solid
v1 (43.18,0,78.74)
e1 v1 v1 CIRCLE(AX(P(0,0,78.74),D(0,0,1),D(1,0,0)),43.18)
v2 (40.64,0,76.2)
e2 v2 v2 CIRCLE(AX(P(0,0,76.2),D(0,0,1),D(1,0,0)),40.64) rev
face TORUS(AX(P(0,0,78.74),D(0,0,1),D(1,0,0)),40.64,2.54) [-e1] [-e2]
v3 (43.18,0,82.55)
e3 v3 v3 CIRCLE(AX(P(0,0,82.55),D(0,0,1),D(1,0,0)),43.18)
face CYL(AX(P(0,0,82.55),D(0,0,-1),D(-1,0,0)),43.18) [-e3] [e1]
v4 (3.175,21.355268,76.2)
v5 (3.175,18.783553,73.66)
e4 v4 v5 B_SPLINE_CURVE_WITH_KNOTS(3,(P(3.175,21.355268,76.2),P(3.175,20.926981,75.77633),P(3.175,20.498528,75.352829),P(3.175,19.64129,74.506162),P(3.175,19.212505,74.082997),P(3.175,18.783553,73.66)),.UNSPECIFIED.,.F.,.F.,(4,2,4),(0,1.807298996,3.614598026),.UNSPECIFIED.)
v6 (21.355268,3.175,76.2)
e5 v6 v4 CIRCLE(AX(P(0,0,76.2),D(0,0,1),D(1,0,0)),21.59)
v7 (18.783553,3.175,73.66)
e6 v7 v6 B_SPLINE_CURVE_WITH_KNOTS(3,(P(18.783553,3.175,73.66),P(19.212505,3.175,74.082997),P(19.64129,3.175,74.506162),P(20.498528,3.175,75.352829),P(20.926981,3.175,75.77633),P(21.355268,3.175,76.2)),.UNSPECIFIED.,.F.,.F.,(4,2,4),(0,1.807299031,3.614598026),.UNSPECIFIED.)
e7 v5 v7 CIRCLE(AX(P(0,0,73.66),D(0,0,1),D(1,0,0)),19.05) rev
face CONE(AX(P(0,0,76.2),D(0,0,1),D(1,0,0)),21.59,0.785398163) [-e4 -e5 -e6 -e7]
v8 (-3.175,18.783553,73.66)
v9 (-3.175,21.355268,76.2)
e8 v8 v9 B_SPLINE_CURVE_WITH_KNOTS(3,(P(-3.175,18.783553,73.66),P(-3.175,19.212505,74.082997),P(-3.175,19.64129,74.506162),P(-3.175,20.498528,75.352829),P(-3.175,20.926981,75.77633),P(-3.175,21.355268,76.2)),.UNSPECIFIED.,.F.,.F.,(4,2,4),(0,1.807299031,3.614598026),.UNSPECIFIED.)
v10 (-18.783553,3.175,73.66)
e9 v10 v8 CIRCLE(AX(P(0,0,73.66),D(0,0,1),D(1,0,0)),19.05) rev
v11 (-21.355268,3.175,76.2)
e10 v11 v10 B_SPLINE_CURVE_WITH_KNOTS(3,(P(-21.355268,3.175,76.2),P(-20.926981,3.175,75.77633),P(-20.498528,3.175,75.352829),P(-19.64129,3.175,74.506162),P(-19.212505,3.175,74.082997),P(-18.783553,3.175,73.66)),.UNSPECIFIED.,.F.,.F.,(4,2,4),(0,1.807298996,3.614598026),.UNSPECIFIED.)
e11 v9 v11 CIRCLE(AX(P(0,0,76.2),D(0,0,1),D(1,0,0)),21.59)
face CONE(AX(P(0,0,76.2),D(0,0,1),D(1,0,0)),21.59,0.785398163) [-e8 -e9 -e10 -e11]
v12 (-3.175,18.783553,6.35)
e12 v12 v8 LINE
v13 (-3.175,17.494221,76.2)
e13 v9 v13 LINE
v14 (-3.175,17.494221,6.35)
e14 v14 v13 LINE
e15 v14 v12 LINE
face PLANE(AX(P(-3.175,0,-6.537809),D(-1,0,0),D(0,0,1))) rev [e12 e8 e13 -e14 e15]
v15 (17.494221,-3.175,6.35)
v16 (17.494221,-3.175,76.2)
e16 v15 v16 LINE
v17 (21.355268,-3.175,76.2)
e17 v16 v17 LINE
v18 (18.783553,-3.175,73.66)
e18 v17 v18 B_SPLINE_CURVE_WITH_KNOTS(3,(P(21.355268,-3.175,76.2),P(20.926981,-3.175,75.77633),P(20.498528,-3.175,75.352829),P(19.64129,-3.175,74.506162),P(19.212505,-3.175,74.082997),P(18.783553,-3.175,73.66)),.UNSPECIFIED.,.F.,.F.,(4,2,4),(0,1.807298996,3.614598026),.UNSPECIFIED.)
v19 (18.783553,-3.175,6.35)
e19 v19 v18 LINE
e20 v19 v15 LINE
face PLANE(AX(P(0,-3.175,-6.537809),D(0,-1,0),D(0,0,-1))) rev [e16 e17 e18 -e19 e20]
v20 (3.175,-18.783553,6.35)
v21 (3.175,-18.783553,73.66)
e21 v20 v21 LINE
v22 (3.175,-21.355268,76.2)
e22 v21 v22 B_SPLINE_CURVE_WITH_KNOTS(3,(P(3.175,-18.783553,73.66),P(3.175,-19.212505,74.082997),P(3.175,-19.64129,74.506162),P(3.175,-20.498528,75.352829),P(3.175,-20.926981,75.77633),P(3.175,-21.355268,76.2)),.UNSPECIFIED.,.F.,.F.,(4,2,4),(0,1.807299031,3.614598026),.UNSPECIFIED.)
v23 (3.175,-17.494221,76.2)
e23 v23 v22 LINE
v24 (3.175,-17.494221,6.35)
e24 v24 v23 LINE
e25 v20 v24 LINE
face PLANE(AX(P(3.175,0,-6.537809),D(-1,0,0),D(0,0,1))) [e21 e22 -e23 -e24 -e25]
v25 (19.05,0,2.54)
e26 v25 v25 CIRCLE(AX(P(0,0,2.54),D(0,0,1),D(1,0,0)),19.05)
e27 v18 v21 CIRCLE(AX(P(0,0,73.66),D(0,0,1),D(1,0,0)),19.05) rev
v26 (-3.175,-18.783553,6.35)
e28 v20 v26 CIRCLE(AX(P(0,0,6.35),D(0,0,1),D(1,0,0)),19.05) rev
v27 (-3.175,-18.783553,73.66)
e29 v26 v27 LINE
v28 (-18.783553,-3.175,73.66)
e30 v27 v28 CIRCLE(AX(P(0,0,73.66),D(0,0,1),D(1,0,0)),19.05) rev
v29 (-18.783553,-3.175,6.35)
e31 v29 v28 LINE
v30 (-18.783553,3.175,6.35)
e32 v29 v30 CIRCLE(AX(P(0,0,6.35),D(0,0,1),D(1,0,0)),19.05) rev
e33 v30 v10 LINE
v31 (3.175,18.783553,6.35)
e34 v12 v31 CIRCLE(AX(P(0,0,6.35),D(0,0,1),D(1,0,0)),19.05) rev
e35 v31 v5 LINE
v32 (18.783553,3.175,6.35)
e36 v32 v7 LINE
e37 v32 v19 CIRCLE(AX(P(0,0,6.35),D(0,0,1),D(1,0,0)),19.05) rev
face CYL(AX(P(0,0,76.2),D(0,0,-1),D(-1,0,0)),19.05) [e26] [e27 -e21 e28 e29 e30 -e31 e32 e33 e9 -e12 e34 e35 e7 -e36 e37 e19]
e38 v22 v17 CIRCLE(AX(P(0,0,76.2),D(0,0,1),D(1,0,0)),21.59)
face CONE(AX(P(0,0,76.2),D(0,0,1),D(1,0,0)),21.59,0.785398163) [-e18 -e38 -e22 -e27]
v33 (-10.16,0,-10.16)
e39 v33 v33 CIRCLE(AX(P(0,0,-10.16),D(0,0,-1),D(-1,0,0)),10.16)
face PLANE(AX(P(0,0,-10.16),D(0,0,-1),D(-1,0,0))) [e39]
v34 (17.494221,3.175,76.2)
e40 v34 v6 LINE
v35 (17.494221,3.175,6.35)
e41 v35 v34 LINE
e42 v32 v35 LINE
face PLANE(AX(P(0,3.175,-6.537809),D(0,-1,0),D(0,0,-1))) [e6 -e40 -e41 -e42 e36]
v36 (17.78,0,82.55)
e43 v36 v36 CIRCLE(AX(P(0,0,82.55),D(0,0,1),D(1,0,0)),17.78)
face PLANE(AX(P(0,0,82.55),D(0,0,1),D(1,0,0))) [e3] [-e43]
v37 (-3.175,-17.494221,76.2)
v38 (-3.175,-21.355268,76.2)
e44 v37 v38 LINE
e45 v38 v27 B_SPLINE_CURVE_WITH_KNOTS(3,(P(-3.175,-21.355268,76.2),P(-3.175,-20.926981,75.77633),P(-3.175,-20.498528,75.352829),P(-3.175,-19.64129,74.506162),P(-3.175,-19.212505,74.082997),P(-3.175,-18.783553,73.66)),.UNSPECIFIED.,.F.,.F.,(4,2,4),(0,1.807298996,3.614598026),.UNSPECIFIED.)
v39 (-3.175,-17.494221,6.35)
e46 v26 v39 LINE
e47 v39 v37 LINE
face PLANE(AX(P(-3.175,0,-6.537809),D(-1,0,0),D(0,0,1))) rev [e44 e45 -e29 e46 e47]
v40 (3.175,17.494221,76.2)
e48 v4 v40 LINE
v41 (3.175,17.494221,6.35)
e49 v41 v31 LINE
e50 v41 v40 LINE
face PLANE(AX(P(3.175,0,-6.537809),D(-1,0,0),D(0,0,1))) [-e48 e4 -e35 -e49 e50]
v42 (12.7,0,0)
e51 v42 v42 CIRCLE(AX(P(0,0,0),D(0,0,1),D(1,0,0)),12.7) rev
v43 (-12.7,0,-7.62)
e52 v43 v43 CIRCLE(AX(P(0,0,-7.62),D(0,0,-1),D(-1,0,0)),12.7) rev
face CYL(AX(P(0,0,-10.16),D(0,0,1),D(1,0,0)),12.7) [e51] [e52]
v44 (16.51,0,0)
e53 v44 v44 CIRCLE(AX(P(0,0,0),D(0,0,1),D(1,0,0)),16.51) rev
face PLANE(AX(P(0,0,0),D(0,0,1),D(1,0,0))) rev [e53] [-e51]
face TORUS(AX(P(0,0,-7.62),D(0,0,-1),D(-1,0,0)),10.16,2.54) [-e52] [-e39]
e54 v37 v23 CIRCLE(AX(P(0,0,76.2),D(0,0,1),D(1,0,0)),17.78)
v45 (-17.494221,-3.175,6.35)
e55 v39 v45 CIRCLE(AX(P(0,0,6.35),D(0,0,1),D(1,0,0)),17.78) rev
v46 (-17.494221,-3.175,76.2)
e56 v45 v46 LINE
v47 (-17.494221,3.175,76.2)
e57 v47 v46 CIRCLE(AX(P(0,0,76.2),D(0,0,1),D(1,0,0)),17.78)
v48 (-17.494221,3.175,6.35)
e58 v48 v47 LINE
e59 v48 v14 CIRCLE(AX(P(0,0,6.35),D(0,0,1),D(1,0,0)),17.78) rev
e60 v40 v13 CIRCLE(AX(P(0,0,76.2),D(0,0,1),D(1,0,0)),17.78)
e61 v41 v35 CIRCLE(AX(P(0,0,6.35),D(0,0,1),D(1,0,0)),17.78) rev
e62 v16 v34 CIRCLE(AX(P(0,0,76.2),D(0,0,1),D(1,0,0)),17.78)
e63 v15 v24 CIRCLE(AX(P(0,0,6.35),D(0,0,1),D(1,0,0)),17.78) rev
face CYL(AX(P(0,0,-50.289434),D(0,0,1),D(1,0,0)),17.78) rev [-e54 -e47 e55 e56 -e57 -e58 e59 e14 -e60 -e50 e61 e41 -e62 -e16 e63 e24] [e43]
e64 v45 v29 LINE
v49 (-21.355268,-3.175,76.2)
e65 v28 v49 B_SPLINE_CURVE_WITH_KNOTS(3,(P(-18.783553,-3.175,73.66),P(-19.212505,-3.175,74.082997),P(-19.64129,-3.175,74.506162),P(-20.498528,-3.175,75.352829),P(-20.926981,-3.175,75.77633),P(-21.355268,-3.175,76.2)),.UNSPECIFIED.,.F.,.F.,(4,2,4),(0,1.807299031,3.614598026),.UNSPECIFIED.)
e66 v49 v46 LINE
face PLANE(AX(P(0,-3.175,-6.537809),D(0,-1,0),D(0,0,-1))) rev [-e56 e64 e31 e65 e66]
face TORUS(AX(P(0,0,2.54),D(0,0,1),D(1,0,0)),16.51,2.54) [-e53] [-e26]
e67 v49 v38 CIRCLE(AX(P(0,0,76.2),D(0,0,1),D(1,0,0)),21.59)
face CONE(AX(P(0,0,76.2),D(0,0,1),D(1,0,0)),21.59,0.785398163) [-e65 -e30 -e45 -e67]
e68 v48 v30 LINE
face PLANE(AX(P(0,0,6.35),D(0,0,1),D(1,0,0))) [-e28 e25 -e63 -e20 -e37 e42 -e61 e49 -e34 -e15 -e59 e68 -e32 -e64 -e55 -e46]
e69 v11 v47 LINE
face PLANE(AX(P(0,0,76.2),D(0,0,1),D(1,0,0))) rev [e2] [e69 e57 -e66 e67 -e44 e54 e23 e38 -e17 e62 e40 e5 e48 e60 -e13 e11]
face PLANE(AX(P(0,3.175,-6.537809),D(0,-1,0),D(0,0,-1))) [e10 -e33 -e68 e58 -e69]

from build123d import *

# Parameters (mm, degrees)
SKETCH1_R           = 19.05
BOSS_EXTRUDE1_DEPTH = 76.2
SKETCH2_R           = 17.78
CUT_EXTRUDE1_DEPTH  = 69.85
CUT_EXTRUDE2_DEPTH  = 69.85
BOSS_EXTRUDE2_START = 6.35
SKETCH4_R           = 43.18
SKETCH4_R_2         = 17.78
BOSS_EXTRUDE2_DEPTH = 6.35
SKETCH5_R           = 12.7
BOSS_EXTRUDE3_DEPTH = 10.16
FILLET1_R           = 2.54
CHAMFER1_SIZE       = 2.54


with BuildPart() as part:
    # Sketch1 → Boss-Extrude1 (new body)
    with BuildSketch(Plane.XY):
        with Locations(Location((0, 0, 0), (0, 0, 180))):
            Circle(SKETCH1_R)
    extrude(amount=BOSS_EXTRUDE1_DEPTH)

    # Sketch2 → Cut-Extrude1 (cut)
    with BuildSketch(Plane.XY.offset(76.2)):
        Circle(SKETCH2_R)
    extrude(amount=-CUT_EXTRUDE1_DEPTH, mode=Mode.SUBTRACT)

    # Sketch3 → Cut-Extrude2 (cut)
    with BuildSketch(Plane.XY.offset(76.2)):
        with BuildLine():
            Line((-17.494221189, 3.175), (-18.783553311, 3.175))
            ThreePointArc((-18.783553311, 3.175), (-19.05, 0), (-18.783553311, -3.175))
            Line((-18.783553311, -3.175), (-17.494221189, -3.175))
            ThreePointArc((-17.494221189, -3.175), (-17.78, 0), (-17.494221189, 3.175))
        make_face()
        with BuildLine():
            ThreePointArc((19.05, 0), (18.983271459, 1.593080258), (18.783553311, 3.175))
            Line((18.783553311, 3.175), (17.494221189, 3.175))
            ThreePointArc((17.494221189, 3.175), (17.708411176, 1.593917699), (17.78, 0))
            ThreePointArc((17.78, 0), (17.708411176, -1.593917699), (17.494221189, -3.175))
            Line((17.494221189, -3.175), (18.783553311, -3.175))
            ThreePointArc((18.783553311, -3.175), (18.983271459, -1.593080258), (19.05, 0))
        make_face()
        with BuildLine():
            ThreePointArc((3.175, 18.783553311), (0, 19.05), (-3.175, 18.783553311))
            Line((-3.175, 18.783553311), (-3.175, 17.494221189))
            ThreePointArc((-3.175, 17.494221189), (0, 17.78), (3.175, 17.494221189))
            Line((3.175, 17.494221189), (3.175, 18.783553311))
        make_face()
        with BuildLine():
            Line((-3.175, -17.494221189), (-3.175, -18.783553311))
            ThreePointArc((-3.175, -18.783553311), (0, -19.05), (3.175, -18.783553311))
            Line((3.175, -18.783553311), (3.175, -17.494221189))
            ThreePointArc((3.175, -17.494221189), (0, -17.78), (-3.175, -17.494221189))
        make_face()
    extrude(amount=-CUT_EXTRUDE2_DEPTH, mode=Mode.SUBTRACT)

    # Sketch4 → Boss-Extrude2 (add)
    with BuildSketch(Plane.XY.offset(76.2).offset(BOSS_EXTRUDE2_START)):
        Circle(SKETCH4_R)
        Circle(SKETCH4_R_2, mode=Mode.SUBTRACT)
    extrude(amount=-BOSS_EXTRUDE2_DEPTH)

    # Sketch5 → Boss-Extrude3 (add)
    with BuildSketch(Plane(origin=(0, 0, 0), x_dir=(-1, 0, 0), z_dir=(0, 0, -1))):
        with Locations(Location((0, 0, 0), (0, 0, 180))):
            Circle(SKETCH5_R)
    extrude(amount=BOSS_EXTRUDE3_DEPTH)

    # Fillet1
    fillet1_edges = [part.edges().sort_by_distance(p)[0] for p in [
        (19.05, 0, 0),
        (-43.18, 0, 76.2),
        (-12.7, 0, -10.16),
    ]]
    fillet(fillet1_edges, radius=FILLET1_R)

    # Chamfer1
    # the kernel refuses this chamfer: 2.54 mm, written as the material it adds along each edge
    with BuildSketch(Plane(origin=(0, 0, 76.2), x_dir=(-0.9846344295499855, 0.1746282913641848, 0), z_dir=(0.1746282913641848, 0.9846344295499855, 0))) as chamfer1_piece_1_section:
        Polygon((19.05 + CHAMFER1_SIZE, 0), (19.05, -CHAMFER1_SIZE), (19.05, 0), align=None)
    chamfer1_piece_1 = revolve(axis=Axis((0, 0, 76.2), (0, 0, 1)), revolution_arc=110.114055389, mode=Mode.PRIVATE)
    chamfer1_piece_1 = split(chamfer1_piece_1, bisect_by=Plane(origin=(-19.847264072, 3.175, 75.490542074), z_dir=(0, 1, 0)), keep=Keep.TOP, mode=Mode.PRIVATE)
    add(chamfer1_piece_1)
    with BuildSketch(Plane(origin=(0, 0, 76.2), x_dir=(-0.9846344295499855, 0.1746282913641848, 0), z_dir=(0.1746282913641848, 0.9846344295499855, 0))) as chamfer1_piece_2_section:
        Polygon((19.05 + CHAMFER1_SIZE, 0), (19.05, -CHAMFER1_SIZE), (19.05, 0), align=None)
    chamfer1_piece_2 = revolve(axis=Axis((0, 0, 76.2), (0, 0, 1)), revolution_arc=110.114055389, mode=Mode.PRIVATE)
    chamfer1_piece_2 = split(chamfer1_piece_2, bisect_by=Plane(origin=(-14.346148442, -3.175, 74.961482306), z_dir=(0, -1, 0)), keep=Keep.TOP, mode=Mode.PRIVATE)
    chamfer1_piece_2 = split(chamfer1_piece_2, bisect_by=Plane(origin=(-3.175, -14.346148442, 74.961482306), z_dir=(-1, 0, 0)), keep=Keep.TOP, mode=Mode.PRIVATE)
    add(chamfer1_piece_2)
    with BuildSketch(Plane(origin=(0, 0, 76.2), x_dir=(-0.9846344295499855, 0.1746282913641848, 0), z_dir=(0.1746282913641848, 0.9846344295499855, 0))) as chamfer1_piece_3_section:
        Polygon((19.05 + CHAMFER1_SIZE, 0), (19.05, -CHAMFER1_SIZE), (19.05, 0), align=None)
    chamfer1_piece_3 = revolve(axis=Axis((0, 0, 76.2), (0, 0, 1)), revolution_arc=110.114055389, mode=Mode.PRIVATE)
    chamfer1_piece_3 = split(chamfer1_piece_3, bisect_by=Plane(origin=(3.175, -19.847263843, 75.490541907), z_dir=(1, 0, 0)), keep=Keep.TOP, mode=Mode.PRIVATE)
    add(chamfer1_piece_3)
    with BuildSketch(Plane(origin=(0, 0, 76.2), x_dir=(0.9846344295499821, -0.1746282913642033, 0), z_dir=(-0.1746282913642033, -0.9846344295499821, 0))) as chamfer1_piece_4_section:
        Polygon((19.05 + CHAMFER1_SIZE, 0), (19.05, -CHAMFER1_SIZE), (19.05, 0), align=None)
    chamfer1_piece_4 = revolve(axis=Axis((0, 0, 76.2), (0, 0, 1)), revolution_arc=110.114055389, mode=Mode.PRIVATE)
    chamfer1_piece_4 = split(chamfer1_piece_4, bisect_by=Plane(origin=(19.847264072, -3.175, 75.490542074), z_dir=(0, -1, 0)), keep=Keep.TOP, mode=Mode.PRIVATE)
    add(chamfer1_piece_4)
    with BuildSketch(Plane(origin=(0, 0, 76.2), x_dir=(0.9846344295499821, -0.1746282913642033, 0), z_dir=(-0.1746282913642033, -0.9846344295499821, 0))) as chamfer1_piece_5_section:
        Polygon((19.05 + CHAMFER1_SIZE, 0), (19.05, -CHAMFER1_SIZE), (19.05, 0), align=None)
    chamfer1_piece_5 = revolve(axis=Axis((0, 0, 76.2), (0, 0, 1)), revolution_arc=110.114055389, mode=Mode.PRIVATE)
    chamfer1_piece_5 = split(chamfer1_piece_5, bisect_by=Plane(origin=(14.346148442, 3.175, 74.961482306), z_dir=(0, 1, 0)), keep=Keep.TOP, mode=Mode.PRIVATE)
    chamfer1_piece_5 = split(chamfer1_piece_5, bisect_by=Plane(origin=(3.175, 14.346148442, 74.961482306), z_dir=(1, 0, 0)), keep=Keep.TOP, mode=Mode.PRIVATE)
    add(chamfer1_piece_5)
    with BuildSketch(Plane(origin=(0, 0, 76.2), x_dir=(0.9846344295499821, -0.1746282913642033, 0), z_dir=(-0.1746282913642033, -0.9846344295499821, 0))) as chamfer1_piece_6_section:
        Polygon((19.05 + CHAMFER1_SIZE, 0), (19.05, -CHAMFER1_SIZE), (19.05, 0), align=None)
    chamfer1_piece_6 = revolve(axis=Axis((0, 0, 76.2), (0, 0, 1)), revolution_arc=110.114055389, mode=Mode.PRIVATE)
    chamfer1_piece_6 = split(chamfer1_piece_6, bisect_by=Plane(origin=(-3.175, 19.847263843, 75.490541907), z_dir=(-1, 0, 0)), keep=Keep.TOP, mode=Mode.PRIVATE)
    add(chamfer1_piece_6)
    with BuildSketch(Plane(origin=(0, 0, 76.2), x_dir=(0.1746282913641894, 0.9846344295499847, 0), z_dir=(0.9846344295499847, -0.1746282913641894, 0))) as chamfer1_piece_7_section:
        Polygon((19.05 + CHAMFER1_SIZE, 0), (19.05, -CHAMFER1_SIZE), (19.05, 0), align=None)
    chamfer1_piece_7 = revolve(axis=Axis((0, 0, 76.2), (0, 0, 1)), revolution_arc=110.114055389, mode=Mode.PRIVATE)
    chamfer1_piece_7 = split(chamfer1_piece_7, bisect_by=Plane(origin=(3.175, 19.847264072, 75.490542074), z_dir=(1, 0, 0)), keep=Keep.TOP, mode=Mode.PRIVATE)
    add(chamfer1_piece_7)
    with BuildSketch(Plane(origin=(0, 0, 76.2), x_dir=(0.1746282913641894, 0.9846344295499847, 0), z_dir=(0.9846344295499847, -0.1746282913641894, 0))) as chamfer1_piece_8_section:
        Polygon((19.05 + CHAMFER1_SIZE, 0), (19.05, -CHAMFER1_SIZE), (19.05, 0), align=None)
    chamfer1_piece_8 = revolve(axis=Axis((0, 0, 76.2), (0, 0, 1)), revolution_arc=110.114055389, mode=Mode.PRIVATE)
    chamfer1_piece_8 = split(chamfer1_piece_8, bisect_by=Plane(origin=(-3.175, 14.346148442, 74.961482306), z_dir=(-1, 0, 0)), keep=Keep.TOP, mode=Mode.PRIVATE)
    chamfer1_piece_8 = split(chamfer1_piece_8, bisect_by=Plane(origin=(-14.346148442, 3.175, 74.961482306), z_dir=(0, 1, 0)), keep=Keep.TOP, mode=Mode.PRIVATE)
    add(chamfer1_piece_8)
    with BuildSketch(Plane(origin=(0, 0, 76.2), x_dir=(0.1746282913641894, 0.9846344295499847, 0), z_dir=(0.9846344295499847, -0.1746282913641894, 0))) as chamfer1_piece_9_section:
        Polygon((19.05 + CHAMFER1_SIZE, 0), (19.05, -CHAMFER1_SIZE), (19.05, 0), align=None)
    chamfer1_piece_9 = revolve(axis=Axis((0, 0, 76.2), (0, 0, 1)), revolution_arc=110.114055389, mode=Mode.PRIVATE)
    chamfer1_piece_9 = split(chamfer1_piece_9, bisect_by=Plane(origin=(-19.847263843, -3.175, 75.490541907), z_dir=(0, -1, 0)), keep=Keep.TOP, mode=Mode.PRIVATE)
    add(chamfer1_piece_9)
    with BuildSketch(Plane(origin=(0, 0, 76.2), x_dir=(-0.1746282913641849, -0.9846344295499855, 0), z_dir=(-0.9846344295499855, 0.1746282913641849, 0))) as chamfer1_piece_10_section:
        Polygon((19.05 + CHAMFER1_SIZE, 0), (19.05, -CHAMFER1_SIZE), (19.05, 0), align=None)
    chamfer1_piece_10 = revolve(axis=Axis((0, 0, 76.2), (0, 0, 1)), revolution_arc=110.114055389, mode=Mode.PRIVATE)
    chamfer1_piece_10 = split(chamfer1_piece_10, bisect_by=Plane(origin=(-3.175, -19.847264072, 75.490542074), z_dir=(-1, 0, 0)), keep=Keep.TOP, mode=Mode.PRIVATE)
    add(chamfer1_piece_10)
    with BuildSketch(Plane(origin=(0, 0, 76.2), x_dir=(-0.1746282913641849, -0.9846344295499855, 0), z_dir=(-0.9846344295499855, 0.1746282913641849, 0))) as chamfer1_piece_11_section:
        Polygon((19.05 + CHAMFER1_SIZE, 0), (19.05, -CHAMFER1_SIZE), (19.05, 0), align=None)
    chamfer1_piece_11 = revolve(axis=Axis((0, 0, 76.2), (0, 0, 1)), revolution_arc=110.114055389, mode=Mode.PRIVATE)
    chamfer1_piece_11 = split(chamfer1_piece_11, bisect_by=Plane(origin=(3.175, -14.346148442, 74.961482306), z_dir=(1, 0, 0)), keep=Keep.TOP, mode=Mode.PRIVATE)
    chamfer1_piece_11 = split(chamfer1_piece_11, bisect_by=Plane(origin=(14.346148442, -3.175, 74.961482306), z_dir=(0, -1, 0)), keep=Keep.TOP, mode=Mode.PRIVATE)
    add(chamfer1_piece_11)
    with BuildSketch(Plane(origin=(0, 0, 76.2), x_dir=(-0.1746282913641849, -0.9846344295499855, 0), z_dir=(-0.9846344295499855, 0.1746282913641849, 0))) as chamfer1_piece_12_section:
        Polygon((19.05 + CHAMFER1_SIZE, 0), (19.05, -CHAMFER1_SIZE), (19.05, 0), align=None)
    chamfer1_piece_12 = revolve(axis=Axis((0, 0, 76.2), (0, 0, 1)), revolution_arc=110.114055389, mode=Mode.PRIVATE)
    chamfer1_piece_12 = split(chamfer1_piece_12, bisect_by=Plane(origin=(19.847263843, 3.175, 75.490541907), z_dir=(0, 1, 0)), keep=Keep.TOP, mode=Mode.PRIVATE)
    add(chamfer1_piece_12)


solid = part.part
